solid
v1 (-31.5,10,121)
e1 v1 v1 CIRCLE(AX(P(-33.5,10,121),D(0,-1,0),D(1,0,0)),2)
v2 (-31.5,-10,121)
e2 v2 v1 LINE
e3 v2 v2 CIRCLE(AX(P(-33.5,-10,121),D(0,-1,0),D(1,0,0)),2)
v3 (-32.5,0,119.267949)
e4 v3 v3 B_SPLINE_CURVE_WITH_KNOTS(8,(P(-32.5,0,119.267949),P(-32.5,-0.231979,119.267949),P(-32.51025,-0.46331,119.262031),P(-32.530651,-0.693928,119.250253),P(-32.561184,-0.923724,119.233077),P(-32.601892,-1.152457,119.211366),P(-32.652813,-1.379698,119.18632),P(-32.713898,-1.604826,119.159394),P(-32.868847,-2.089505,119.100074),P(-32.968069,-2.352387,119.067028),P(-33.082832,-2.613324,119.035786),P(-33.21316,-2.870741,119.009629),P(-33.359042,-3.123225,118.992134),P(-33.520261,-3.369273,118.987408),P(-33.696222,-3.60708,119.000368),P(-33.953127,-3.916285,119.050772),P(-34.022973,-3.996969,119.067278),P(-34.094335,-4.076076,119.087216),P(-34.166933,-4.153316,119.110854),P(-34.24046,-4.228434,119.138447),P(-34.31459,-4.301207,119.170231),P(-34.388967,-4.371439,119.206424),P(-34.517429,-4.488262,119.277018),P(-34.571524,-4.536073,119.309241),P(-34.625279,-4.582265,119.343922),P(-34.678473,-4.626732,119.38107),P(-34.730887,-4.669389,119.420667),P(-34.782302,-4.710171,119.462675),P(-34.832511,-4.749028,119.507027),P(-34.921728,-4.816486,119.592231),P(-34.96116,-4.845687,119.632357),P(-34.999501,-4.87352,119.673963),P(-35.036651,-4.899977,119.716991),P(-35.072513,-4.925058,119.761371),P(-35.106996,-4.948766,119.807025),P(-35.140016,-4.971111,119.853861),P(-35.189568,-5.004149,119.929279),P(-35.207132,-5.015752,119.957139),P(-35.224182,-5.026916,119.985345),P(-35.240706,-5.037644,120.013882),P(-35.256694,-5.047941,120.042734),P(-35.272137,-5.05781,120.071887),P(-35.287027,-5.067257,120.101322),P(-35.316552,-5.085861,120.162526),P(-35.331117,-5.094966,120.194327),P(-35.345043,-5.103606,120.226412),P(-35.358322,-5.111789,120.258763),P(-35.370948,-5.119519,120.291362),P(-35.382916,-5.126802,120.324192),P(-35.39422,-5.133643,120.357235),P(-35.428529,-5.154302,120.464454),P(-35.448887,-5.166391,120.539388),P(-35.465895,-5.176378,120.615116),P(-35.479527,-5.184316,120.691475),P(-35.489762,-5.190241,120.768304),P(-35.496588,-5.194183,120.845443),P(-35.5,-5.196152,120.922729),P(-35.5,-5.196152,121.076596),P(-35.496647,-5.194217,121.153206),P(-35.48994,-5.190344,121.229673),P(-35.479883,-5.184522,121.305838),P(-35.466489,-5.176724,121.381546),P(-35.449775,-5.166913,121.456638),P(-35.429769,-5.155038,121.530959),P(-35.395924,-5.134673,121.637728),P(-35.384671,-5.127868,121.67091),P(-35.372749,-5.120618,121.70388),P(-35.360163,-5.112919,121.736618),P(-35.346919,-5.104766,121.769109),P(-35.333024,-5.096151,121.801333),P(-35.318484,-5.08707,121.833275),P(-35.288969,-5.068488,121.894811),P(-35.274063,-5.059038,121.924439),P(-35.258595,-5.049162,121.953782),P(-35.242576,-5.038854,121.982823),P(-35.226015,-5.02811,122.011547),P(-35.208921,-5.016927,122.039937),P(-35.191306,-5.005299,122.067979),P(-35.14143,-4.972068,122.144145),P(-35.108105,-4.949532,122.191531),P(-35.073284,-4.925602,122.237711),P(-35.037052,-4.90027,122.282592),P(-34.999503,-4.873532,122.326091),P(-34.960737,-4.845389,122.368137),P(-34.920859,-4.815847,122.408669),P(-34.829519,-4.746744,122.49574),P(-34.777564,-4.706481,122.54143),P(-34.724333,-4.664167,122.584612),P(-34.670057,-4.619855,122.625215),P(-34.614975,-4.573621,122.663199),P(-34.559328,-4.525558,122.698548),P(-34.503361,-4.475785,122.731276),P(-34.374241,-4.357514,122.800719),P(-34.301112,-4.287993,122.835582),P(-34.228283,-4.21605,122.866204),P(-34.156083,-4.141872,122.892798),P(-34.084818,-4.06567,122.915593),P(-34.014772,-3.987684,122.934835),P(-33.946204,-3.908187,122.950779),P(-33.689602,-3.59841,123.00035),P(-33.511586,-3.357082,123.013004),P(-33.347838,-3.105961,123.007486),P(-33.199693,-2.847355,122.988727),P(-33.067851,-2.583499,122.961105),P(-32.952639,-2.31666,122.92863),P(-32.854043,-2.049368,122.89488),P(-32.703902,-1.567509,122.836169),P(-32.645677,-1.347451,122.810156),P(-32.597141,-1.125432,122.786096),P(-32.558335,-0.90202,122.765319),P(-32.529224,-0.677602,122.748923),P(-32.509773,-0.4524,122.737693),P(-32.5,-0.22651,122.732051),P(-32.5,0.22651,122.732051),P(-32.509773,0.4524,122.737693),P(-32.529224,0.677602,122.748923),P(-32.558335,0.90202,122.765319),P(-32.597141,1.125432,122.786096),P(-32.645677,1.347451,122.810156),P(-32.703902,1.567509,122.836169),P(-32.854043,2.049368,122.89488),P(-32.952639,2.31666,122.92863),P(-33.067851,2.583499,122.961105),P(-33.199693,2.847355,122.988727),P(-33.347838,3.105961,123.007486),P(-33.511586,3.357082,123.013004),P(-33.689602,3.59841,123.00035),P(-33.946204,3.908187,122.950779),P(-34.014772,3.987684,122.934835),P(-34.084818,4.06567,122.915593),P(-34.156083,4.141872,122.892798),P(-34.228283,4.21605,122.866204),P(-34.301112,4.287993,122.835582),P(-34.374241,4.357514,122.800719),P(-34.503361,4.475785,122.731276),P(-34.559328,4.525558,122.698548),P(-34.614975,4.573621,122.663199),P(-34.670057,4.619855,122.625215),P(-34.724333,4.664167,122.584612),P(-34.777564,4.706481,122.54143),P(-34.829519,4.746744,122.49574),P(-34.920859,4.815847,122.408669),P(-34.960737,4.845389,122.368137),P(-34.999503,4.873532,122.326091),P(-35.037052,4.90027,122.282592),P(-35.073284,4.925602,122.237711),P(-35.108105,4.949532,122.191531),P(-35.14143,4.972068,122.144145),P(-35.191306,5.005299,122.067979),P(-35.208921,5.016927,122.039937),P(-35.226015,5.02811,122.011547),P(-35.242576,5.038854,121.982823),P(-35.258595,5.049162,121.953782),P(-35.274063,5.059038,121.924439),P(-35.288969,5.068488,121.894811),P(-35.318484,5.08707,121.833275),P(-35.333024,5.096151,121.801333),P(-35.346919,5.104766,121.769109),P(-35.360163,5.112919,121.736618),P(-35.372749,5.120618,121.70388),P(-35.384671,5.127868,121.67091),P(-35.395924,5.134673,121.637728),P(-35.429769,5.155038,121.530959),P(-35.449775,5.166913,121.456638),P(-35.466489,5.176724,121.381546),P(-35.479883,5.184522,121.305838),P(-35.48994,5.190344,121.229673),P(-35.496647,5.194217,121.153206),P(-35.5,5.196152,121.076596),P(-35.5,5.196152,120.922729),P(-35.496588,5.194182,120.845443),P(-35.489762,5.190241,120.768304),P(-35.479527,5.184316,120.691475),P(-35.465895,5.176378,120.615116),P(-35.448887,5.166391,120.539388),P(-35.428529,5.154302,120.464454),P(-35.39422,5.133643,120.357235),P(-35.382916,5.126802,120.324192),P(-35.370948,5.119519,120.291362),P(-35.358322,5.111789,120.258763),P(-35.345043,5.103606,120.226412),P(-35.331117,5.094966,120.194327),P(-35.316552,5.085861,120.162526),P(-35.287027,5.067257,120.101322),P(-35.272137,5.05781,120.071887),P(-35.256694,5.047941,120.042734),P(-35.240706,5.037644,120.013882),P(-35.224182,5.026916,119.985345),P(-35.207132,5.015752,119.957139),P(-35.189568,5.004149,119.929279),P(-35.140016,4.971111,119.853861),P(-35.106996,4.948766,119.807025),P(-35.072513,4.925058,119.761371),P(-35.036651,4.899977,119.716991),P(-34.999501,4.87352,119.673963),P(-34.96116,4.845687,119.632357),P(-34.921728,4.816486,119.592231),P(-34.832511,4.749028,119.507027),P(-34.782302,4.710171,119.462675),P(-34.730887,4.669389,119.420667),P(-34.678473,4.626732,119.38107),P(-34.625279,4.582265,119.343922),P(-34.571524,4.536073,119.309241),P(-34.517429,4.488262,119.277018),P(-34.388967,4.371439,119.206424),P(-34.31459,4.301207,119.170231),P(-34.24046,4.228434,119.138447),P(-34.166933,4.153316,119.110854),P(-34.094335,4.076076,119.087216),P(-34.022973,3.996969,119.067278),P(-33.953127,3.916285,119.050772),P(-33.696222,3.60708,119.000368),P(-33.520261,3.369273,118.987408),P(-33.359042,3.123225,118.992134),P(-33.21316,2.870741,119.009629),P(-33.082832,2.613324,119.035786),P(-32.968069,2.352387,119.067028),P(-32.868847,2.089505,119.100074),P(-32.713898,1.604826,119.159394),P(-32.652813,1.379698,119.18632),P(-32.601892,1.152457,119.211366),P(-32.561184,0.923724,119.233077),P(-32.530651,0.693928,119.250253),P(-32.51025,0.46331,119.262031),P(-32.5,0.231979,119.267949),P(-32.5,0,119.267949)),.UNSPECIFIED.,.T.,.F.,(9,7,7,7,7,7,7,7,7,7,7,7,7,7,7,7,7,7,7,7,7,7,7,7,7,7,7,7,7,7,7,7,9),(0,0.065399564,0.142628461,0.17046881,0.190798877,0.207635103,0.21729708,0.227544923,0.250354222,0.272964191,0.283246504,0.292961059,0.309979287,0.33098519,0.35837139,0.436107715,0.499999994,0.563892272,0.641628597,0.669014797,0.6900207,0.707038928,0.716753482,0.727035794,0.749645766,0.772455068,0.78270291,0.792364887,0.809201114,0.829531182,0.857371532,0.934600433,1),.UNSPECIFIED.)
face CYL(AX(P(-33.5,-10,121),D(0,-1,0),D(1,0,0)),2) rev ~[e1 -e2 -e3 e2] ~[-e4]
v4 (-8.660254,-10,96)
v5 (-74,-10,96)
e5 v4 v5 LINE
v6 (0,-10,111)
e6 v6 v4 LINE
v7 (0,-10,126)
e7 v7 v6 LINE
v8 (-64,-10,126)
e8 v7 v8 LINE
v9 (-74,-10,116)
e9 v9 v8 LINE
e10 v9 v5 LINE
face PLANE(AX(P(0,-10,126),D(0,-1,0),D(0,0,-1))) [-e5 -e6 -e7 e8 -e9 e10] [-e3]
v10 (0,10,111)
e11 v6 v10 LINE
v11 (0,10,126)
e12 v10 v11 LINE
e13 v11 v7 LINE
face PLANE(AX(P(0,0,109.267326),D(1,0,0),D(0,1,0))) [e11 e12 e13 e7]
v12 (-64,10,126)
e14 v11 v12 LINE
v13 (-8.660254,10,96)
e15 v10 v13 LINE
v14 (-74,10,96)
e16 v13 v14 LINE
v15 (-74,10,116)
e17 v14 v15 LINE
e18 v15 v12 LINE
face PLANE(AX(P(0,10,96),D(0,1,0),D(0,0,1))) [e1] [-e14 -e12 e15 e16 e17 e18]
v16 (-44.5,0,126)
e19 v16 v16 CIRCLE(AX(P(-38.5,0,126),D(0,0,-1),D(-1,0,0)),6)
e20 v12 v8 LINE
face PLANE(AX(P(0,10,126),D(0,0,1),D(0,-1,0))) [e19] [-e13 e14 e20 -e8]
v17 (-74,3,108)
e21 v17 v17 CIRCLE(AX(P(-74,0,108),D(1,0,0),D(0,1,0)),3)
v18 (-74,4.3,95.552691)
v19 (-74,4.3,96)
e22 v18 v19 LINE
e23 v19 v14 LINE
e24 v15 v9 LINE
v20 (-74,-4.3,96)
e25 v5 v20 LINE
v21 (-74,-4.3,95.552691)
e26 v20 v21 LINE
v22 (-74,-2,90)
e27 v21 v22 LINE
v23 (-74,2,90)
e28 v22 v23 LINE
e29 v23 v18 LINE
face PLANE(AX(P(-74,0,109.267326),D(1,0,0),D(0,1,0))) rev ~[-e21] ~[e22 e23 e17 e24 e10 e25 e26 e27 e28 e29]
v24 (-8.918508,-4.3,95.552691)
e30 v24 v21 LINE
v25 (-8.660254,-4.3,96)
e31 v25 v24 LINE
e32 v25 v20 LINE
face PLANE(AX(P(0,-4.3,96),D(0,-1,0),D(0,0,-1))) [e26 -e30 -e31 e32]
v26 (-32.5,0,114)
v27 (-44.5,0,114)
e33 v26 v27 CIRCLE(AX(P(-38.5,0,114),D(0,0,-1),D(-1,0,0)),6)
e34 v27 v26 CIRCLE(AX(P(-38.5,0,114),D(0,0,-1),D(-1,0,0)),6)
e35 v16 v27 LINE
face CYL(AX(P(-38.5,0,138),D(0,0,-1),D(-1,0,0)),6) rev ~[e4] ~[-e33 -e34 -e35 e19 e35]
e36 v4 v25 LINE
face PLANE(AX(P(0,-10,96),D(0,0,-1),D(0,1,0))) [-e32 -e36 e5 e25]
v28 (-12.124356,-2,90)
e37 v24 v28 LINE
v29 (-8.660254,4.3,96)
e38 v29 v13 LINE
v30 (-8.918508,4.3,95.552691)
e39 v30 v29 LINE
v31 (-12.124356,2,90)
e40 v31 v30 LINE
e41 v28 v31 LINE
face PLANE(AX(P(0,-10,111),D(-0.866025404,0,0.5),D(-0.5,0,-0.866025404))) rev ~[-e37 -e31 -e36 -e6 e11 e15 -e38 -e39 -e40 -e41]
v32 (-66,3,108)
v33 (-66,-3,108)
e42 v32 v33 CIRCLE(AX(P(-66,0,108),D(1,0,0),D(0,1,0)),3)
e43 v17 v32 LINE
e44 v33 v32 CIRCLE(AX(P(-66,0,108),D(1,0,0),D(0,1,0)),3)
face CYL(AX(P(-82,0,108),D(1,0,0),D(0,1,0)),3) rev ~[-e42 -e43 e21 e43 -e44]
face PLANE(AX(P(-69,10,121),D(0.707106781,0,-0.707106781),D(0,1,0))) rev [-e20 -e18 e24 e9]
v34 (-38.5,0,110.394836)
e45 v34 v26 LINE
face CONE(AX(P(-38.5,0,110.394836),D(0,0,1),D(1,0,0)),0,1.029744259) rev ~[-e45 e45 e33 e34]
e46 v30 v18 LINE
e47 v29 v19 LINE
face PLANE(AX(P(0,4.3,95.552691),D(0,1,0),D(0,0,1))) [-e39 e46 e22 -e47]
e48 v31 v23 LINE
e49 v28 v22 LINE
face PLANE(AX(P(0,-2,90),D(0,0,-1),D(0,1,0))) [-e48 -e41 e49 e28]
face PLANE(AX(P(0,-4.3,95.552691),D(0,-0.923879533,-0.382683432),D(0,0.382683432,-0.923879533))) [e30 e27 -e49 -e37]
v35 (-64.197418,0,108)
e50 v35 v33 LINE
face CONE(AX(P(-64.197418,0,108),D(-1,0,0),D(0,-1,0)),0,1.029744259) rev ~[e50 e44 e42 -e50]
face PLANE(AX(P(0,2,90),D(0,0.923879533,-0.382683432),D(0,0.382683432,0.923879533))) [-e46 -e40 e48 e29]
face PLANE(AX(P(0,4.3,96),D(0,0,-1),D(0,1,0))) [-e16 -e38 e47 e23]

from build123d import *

# Parameters (mm, degrees)
F1_DEPTH     = 11.5
F3_DEPTH     = 5
F5_D         = 14
F5_DEPTH     = 36
F5_TIP       = 4.2060243332
F7_D         = 6.8
F7_DEPTH     = 17
F7_TIP       = 2.0429261047
F8_SIZE2     = 9.237604307
F8_SIZE      = 16
F8_2_SIZE2   = 9.237604307
F8_2_SIZE    = 16
F9_T1_DEPTH  = 23
F9_T6_DEPTH  = 84.5247913859
F9_T12_DEPTH = 98.4752086141
F9_T18_DEPTH = 98.4752086141
F9_T25_DEPTH = 98.4752086141
F9_T32_DEPTH = 98.4752086141
F9_T38_DEPTH = 98.4752086141
F9_T44_DEPTH = 98.4752086141
F9_T51_DEPTH = 98.4752086141
F9_T58_DEPTH = 98.4752086141
F11_DEPTH    = 74
F13_DEPTH    = 20
F14_SIZE2    = 10
F14_SIZE     = 10
F16_D        = 12
F16_DEPTH    = 12
F16_TIP      = 3.6051637142
F17_R        = 2
F18_DEPTH    = 20
F21_D        = 6
F21_DEPTH    = 8
F21_TIP      = 1.8025818571


# Not quite as in the source:
# - a fillet or chamfer that OpenCascade refuses, or shapes differently, is made with other operations: its cross-section is extruded or revolved along the edge and cut away or added


with BuildPart() as f1:
    # F0 (on Front) → F1 (new body, symmetric)
    with BuildSketch(Plane.XZ):
        Polygon((-200, 0), (0, 0), (0, 40), (-63, 40), (-63, 155), (0, 155), (0, 185), (-90, 185), (-200, 30), align=None)
    extrude(amount=F1_DEPTH, both=True)

    # F2 (on face) → F3 (cut)
    with BuildSketch(Plane.YZ.offset(-63)):
        with BuildLine():
            ThreePointArc((3.5, 135), (0, 138.5), (-3.5, 135))
            Line((-3.5, 135), (-3.5, 67))
            ThreePointArc((-3.5, 67), (0, 63.5), (3.5, 67))
            Line((3.5, 67), (3.5, 135))
        make_face()
    extrude(amount=-F3_DEPTH, mode=Mode.SUBTRACT)

    # F5
    with Locations(Plane.XY.offset(185)):
        with Locations((-20, 0)):
            Hole(F5_D / 2, depth=F5_DEPTH)
            with Locations((0, 0, -(F5_DEPTH + F5_TIP / 2))):  # 118° drill point
                Cone(0, F5_D / 2, F5_TIP, mode=Mode.SUBTRACT)

    # F7
    with Locations(Plane(origin=(0, 0, 0), x_dir=(1, 0, 0), z_dir=(0, 0, -1))):
        with Locations((-175, 0), (-125, 0), (-75, 0), (-25, 0)):
            Hole(F7_D / 2, depth=F7_DEPTH)
            with Locations((0, 0, -(F7_DEPTH + F7_TIP / 2))):  # 118° drill point
                Cone(0, F7_D / 2, F7_TIP, mode=Mode.SUBTRACT)

    # F8
    f8_edges = [f1.edges().sort_by_distance(p)[0] for p in [
        (-31.5, -11.5, 40),
    ]]
    f8_side = f1.faces().sort_by_distance((-97.944693, -11.5, 74.396883))[0]
    chamfer(f8_edges, length=F8_SIZE, length2=F8_SIZE2, reference=f8_side)

    # F8#2
    f8_2_edges = [f1.edges().sort_by_distance(p)[0] for p in [
        (-31.5, 11.5, 40),
    ]]
    f8_2_side = f1.faces().sort_by_distance((-97.944693, 11.5, 74.396883))[0]
    chamfer(f8_2_edges, length=F8_2_SIZE, length2=F8_2_SIZE2, reference=f8_2_side)

    # F9: fillet of radius 16 on 4 edges, made by hand

    # F9_s2 → F9_t1 (join)
    with BuildSketch(Plane.XZ.offset(-11.5)):
        with BuildLine():
            ThreePointArc((-63, 139), (-58.313708499, 150.313708499), (-47, 155))
            Line((-47, 155), (-63, 155))
            Line((-63, 155), (-63, 139))
        make_face()
    extrude(amount=F9_T1_DEPTH)


with BuildPart() as f9_tool4:
    # F9_s5 → F9_t6 (new body)
    with BuildSketch(Plane.XZ.offset(-42.262395693)):
        with BuildLine():
            ThreePointArc((-47, 40), (-58.313708499, 44.686291501), (-63, 56))
            Line((-63, 56), (-63, 40))
            Line((-63, 40), (-47, 40))
        make_face()
    extrude(amount=F9_T6_DEPTH)

    split(bisect_by=Plane.XZ.offset(-11.5), keep=Keep.TOP)

    split(bisect_by=Plane.XZ.offset(11.5), keep=Keep.BOTTOM)


with BuildPart() as f1_1:
    add(f1.part)

    # F9_t3: union F9_tool4
    add(f9_tool4.part)


with BuildPart() as f9_tool10:
    # F9_s11 → F9_t12 (new body)
    with BuildSketch(Plane(origin=(0, -12.4826951546, -21.6206622231), x_dir=(1, 0, 0), z_dir=(0, 0.5, 0.8660254038))):
        with BuildLine():
            ThreePointArc((-47, -21.9592921435), (-58.313708499, -26.6455836445), (-63, -37.9592921435))
            Line((-63, -37.9592921435), (-63, -21.9592921435))
            Line((-63, -21.9592921435), (-47, -21.9592921435))
        make_face()
    extrude(amount=F9_T12_DEPTH)

    split(bisect_by=Plane.XY.offset(40), keep=Keep.BOTTOM)

    split(bisect_by=Plane.XZ.offset(11.5), keep=Keep.TOP)


with BuildPart() as f1_2:
    add(f1_1.part)

    # F9_t9: union F9_tool10
    add(f9_tool10.part)


with BuildPart() as f9_tool16:
    # F9_s17 → F9_t18 (new body)
    with BuildSketch(Plane(origin=(0, -12.4826951546, -21.6206622231), x_dir=(1, 0, 0), z_dir=(0, 0.5, 0.8660254038))):
        with BuildLine():
            ThreePointArc((-47, -21.9592921435), (-58.313708499, -26.6455836445), (-63, -37.9592921435))
            Line((-63, -37.9592921435), (-63, -21.9592921435))
            Line((-63, -21.9592921435), (-47, -21.9592921435))
        make_face()
    extrude(amount=F9_T18_DEPTH)

    split(bisect_by=Plane.XY.offset(40), keep=Keep.BOTTOM)

    split(bisect_by=Plane.XZ.offset(11.5), keep=Keep.BOTTOM)

    split(bisect_by=Plane.XZ.offset(3.5), keep=Keep.TOP)


with BuildPart() as f1_3:
    add(f1_2.part)

    # F9_t15: union F9_tool16
    add(f9_tool16.part)


with BuildPart() as f9_tool23:
    # F9_s24 → F9_t25 (new body)
    with BuildSketch(Plane(origin=(0, -12.4826951546, -21.6206622231), x_dir=(1, 0, 0), z_dir=(0, 0.5, 0.8660254038))):
        with BuildLine():
            ThreePointArc((-47, -21.9592921435), (-58.313708499, -26.6455836445), (-63, -37.9592921435))
            Line((-63, -37.9592921435), (-63, -21.9592921435))
            Line((-63, -21.9592921435), (-47, -21.9592921435))
        make_face()
    extrude(amount=F9_T25_DEPTH)

    split(bisect_by=Plane.XY.offset(40), keep=Keep.TOP)

    split(bisect_by=Plane.XZ.offset(11.5), keep=Keep.BOTTOM)

    split(bisect_by=Plane.XZ.offset(3.5), keep=Keep.TOP)


with BuildPart() as f1_4:
    add(f1_3.part)

    # F9_t22: union F9_tool23
    add(f9_tool23.part)


with BuildPart() as f9_tool30:
    # F9_s31 → F9_t32 (new body)
    with BuildSketch(Plane(origin=(0, -12.4826951546, -21.6206622231), x_dir=(1, 0, 0), z_dir=(0, 0.5, 0.8660254038))):
        with BuildLine():
            ThreePointArc((-47, -21.9592921435), (-58.313708499, -26.6455836445), (-63, -37.9592921435))
            Line((-63, -37.9592921435), (-63, -21.9592921435))
            Line((-63, -21.9592921435), (-47, -21.9592921435))
        make_face()
    extrude(amount=F9_T32_DEPTH)

    split(bisect_by=Plane.XY.offset(40), keep=Keep.BOTTOM)

    split(bisect_by=Plane.XZ.offset(3.5), keep=Keep.BOTTOM)


with BuildPart() as f1_5:
    add(f1_4.part)

    # F9_t29: union F9_tool30
    add(f9_tool30.part)


with BuildPart() as f9_tool36:
    # F9_s37 → F9_t38 (new body)
    with BuildSketch(Plane(origin=(0, 12.4826951546, -21.6206622231), x_dir=(1, 0, 0), z_dir=(0, -0.5, 0.8660254038))):
        with BuildLine():
            ThreePointArc((-47, 21.9592921435), (-58.313708499, 26.6455836445), (-63, 37.9592921435))
            Line((-63, 37.9592921435), (-63, 21.9592921435))
            Line((-63, 21.9592921435), (-47, 21.9592921435))
        make_face()
    extrude(amount=F9_T38_DEPTH)

    split(bisect_by=Plane.XY.offset(40), keep=Keep.BOTTOM)

    split(bisect_by=Plane.XZ.offset(-11.5), keep=Keep.BOTTOM)


with BuildPart() as f1_6:
    add(f1_5.part)

    # F9_t35: union F9_tool36
    add(f9_tool36.part)


with BuildPart() as f9_tool42:
    # F9_s43 → F9_t44 (new body)
    with BuildSketch(Plane(origin=(0, 12.4826951546, -21.6206622231), x_dir=(1, 0, 0), z_dir=(0, -0.5, 0.8660254038))):
        with BuildLine():
            ThreePointArc((-47, 21.9592921435), (-58.313708499, 26.6455836445), (-63, 37.9592921435))
            Line((-63, 37.9592921435), (-63, 21.9592921435))
            Line((-63, 21.9592921435), (-47, 21.9592921435))
        make_face()
    extrude(amount=F9_T44_DEPTH)

    split(bisect_by=Plane.XY.offset(40), keep=Keep.BOTTOM)

    split(bisect_by=Plane.XZ.offset(-11.5), keep=Keep.TOP)

    split(bisect_by=Plane.XZ.offset(-3.5), keep=Keep.BOTTOM)


with BuildPart() as f1_7:
    add(f1_6.part)

    # F9_t41: union F9_tool42
    add(f9_tool42.part)


with BuildPart() as f9_tool49:
    # F9_s50 → F9_t51 (new body)
    with BuildSketch(Plane(origin=(0, 12.4826951546, -21.6206622231), x_dir=(1, 0, 0), z_dir=(0, -0.5, 0.8660254038))):
        with BuildLine():
            ThreePointArc((-47, 21.9592921435), (-58.313708499, 26.6455836445), (-63, 37.9592921435))
            Line((-63, 37.9592921435), (-63, 21.9592921435))
            Line((-63, 21.9592921435), (-47, 21.9592921435))
        make_face()
    extrude(amount=F9_T51_DEPTH)

    split(bisect_by=Plane.XY.offset(40), keep=Keep.TOP)

    split(bisect_by=Plane.XZ.offset(-11.5), keep=Keep.TOP)

    split(bisect_by=Plane.XZ.offset(-3.5), keep=Keep.BOTTOM)


with BuildPart() as f1_8:
    add(f1_7.part)

    # F9_t48: union F9_tool49
    add(f9_tool49.part)


with BuildPart() as f9_tool56:
    # F9_s57 → F9_t58 (new body)
    with BuildSketch(Plane(origin=(0, 12.4826951546, -21.6206622231), x_dir=(1, 0, 0), z_dir=(0, -0.5, 0.8660254038))):
        with BuildLine():
            ThreePointArc((-47, 21.9592921435), (-58.313708499, 26.6455836445), (-63, 37.9592921435))
            Line((-63, 37.9592921435), (-63, 21.9592921435))
            Line((-63, 21.9592921435), (-47, 21.9592921435))
        make_face()
    extrude(amount=F9_T58_DEPTH)

    split(bisect_by=Plane.XY.offset(40), keep=Keep.BOTTOM)

    split(bisect_by=Plane.XZ.offset(-3.5), keep=Keep.TOP)


with BuildPart() as f1_9:
    add(f1_8.part)

    # F9_t55: union F9_tool56
    add(f9_tool56.part)


with BuildPart() as f11:
    # F10 (on Right) → F11 (new body)
    with BuildSketch(Plane.YZ):
        Polygon((-2, 90), (0, 90), (2, 90), (4.3, 95.5526911935), (4.3, 96), (10, 96), (10, 126), (0, 126), (-10, 126), (-10, 96), (-4.3, 96), (-4.3, 95.5526911935), align=None)
    extrude(amount=-F11_DEPTH)

    # F12 (on face) → F13 (cut, through all)
    with BuildSketch(Plane.XZ.offset(10)):
        Polygon((0, 90), (0, 111), (-12.124355653, 90), align=None)
    extrude(amount=-F13_DEPTH, mode=Mode.SUBTRACT)

    # F14
    f14_edges = [f11.edges().sort_by_distance(p)[0] for p in [
        (-74, 0, 126),
    ]]
    chamfer(f14_edges, length=F14_SIZE, length2=F14_SIZE2)

    # F16
    with Locations(Plane.XY.offset(126)):
        with Locations((-38.5, 0)):
            Hole(F16_D / 2, depth=F16_DEPTH)
            with Locations((0, 0, -(F16_DEPTH + F16_TIP / 2))):  # 118° drill point
                Cone(0, F16_D / 2, F16_TIP, mode=Mode.SUBTRACT)

    # F17 (on face) → F18 (cut, through all)
    with BuildSketch(Plane.XZ.offset(10)):
        with Locations((-33.5, 121)):
            Circle(F17_R)
    extrude(amount=-F18_DEPTH, mode=Mode.SUBTRACT)

    # F21
    with Locations(Plane(origin=(-74, 0, 0), x_dir=(0, -1, 0), z_dir=(-1, 0, 0))):
        with Locations((0, 108)):
            Hole(F21_D / 2, depth=F21_DEPTH)
            with Locations((0, 0, -(F21_DEPTH + F21_TIP / 2))):  # 118° drill point
                Cone(0, F21_D / 2, F21_TIP, mode=Mode.SUBTRACT)


solid = f11.part
